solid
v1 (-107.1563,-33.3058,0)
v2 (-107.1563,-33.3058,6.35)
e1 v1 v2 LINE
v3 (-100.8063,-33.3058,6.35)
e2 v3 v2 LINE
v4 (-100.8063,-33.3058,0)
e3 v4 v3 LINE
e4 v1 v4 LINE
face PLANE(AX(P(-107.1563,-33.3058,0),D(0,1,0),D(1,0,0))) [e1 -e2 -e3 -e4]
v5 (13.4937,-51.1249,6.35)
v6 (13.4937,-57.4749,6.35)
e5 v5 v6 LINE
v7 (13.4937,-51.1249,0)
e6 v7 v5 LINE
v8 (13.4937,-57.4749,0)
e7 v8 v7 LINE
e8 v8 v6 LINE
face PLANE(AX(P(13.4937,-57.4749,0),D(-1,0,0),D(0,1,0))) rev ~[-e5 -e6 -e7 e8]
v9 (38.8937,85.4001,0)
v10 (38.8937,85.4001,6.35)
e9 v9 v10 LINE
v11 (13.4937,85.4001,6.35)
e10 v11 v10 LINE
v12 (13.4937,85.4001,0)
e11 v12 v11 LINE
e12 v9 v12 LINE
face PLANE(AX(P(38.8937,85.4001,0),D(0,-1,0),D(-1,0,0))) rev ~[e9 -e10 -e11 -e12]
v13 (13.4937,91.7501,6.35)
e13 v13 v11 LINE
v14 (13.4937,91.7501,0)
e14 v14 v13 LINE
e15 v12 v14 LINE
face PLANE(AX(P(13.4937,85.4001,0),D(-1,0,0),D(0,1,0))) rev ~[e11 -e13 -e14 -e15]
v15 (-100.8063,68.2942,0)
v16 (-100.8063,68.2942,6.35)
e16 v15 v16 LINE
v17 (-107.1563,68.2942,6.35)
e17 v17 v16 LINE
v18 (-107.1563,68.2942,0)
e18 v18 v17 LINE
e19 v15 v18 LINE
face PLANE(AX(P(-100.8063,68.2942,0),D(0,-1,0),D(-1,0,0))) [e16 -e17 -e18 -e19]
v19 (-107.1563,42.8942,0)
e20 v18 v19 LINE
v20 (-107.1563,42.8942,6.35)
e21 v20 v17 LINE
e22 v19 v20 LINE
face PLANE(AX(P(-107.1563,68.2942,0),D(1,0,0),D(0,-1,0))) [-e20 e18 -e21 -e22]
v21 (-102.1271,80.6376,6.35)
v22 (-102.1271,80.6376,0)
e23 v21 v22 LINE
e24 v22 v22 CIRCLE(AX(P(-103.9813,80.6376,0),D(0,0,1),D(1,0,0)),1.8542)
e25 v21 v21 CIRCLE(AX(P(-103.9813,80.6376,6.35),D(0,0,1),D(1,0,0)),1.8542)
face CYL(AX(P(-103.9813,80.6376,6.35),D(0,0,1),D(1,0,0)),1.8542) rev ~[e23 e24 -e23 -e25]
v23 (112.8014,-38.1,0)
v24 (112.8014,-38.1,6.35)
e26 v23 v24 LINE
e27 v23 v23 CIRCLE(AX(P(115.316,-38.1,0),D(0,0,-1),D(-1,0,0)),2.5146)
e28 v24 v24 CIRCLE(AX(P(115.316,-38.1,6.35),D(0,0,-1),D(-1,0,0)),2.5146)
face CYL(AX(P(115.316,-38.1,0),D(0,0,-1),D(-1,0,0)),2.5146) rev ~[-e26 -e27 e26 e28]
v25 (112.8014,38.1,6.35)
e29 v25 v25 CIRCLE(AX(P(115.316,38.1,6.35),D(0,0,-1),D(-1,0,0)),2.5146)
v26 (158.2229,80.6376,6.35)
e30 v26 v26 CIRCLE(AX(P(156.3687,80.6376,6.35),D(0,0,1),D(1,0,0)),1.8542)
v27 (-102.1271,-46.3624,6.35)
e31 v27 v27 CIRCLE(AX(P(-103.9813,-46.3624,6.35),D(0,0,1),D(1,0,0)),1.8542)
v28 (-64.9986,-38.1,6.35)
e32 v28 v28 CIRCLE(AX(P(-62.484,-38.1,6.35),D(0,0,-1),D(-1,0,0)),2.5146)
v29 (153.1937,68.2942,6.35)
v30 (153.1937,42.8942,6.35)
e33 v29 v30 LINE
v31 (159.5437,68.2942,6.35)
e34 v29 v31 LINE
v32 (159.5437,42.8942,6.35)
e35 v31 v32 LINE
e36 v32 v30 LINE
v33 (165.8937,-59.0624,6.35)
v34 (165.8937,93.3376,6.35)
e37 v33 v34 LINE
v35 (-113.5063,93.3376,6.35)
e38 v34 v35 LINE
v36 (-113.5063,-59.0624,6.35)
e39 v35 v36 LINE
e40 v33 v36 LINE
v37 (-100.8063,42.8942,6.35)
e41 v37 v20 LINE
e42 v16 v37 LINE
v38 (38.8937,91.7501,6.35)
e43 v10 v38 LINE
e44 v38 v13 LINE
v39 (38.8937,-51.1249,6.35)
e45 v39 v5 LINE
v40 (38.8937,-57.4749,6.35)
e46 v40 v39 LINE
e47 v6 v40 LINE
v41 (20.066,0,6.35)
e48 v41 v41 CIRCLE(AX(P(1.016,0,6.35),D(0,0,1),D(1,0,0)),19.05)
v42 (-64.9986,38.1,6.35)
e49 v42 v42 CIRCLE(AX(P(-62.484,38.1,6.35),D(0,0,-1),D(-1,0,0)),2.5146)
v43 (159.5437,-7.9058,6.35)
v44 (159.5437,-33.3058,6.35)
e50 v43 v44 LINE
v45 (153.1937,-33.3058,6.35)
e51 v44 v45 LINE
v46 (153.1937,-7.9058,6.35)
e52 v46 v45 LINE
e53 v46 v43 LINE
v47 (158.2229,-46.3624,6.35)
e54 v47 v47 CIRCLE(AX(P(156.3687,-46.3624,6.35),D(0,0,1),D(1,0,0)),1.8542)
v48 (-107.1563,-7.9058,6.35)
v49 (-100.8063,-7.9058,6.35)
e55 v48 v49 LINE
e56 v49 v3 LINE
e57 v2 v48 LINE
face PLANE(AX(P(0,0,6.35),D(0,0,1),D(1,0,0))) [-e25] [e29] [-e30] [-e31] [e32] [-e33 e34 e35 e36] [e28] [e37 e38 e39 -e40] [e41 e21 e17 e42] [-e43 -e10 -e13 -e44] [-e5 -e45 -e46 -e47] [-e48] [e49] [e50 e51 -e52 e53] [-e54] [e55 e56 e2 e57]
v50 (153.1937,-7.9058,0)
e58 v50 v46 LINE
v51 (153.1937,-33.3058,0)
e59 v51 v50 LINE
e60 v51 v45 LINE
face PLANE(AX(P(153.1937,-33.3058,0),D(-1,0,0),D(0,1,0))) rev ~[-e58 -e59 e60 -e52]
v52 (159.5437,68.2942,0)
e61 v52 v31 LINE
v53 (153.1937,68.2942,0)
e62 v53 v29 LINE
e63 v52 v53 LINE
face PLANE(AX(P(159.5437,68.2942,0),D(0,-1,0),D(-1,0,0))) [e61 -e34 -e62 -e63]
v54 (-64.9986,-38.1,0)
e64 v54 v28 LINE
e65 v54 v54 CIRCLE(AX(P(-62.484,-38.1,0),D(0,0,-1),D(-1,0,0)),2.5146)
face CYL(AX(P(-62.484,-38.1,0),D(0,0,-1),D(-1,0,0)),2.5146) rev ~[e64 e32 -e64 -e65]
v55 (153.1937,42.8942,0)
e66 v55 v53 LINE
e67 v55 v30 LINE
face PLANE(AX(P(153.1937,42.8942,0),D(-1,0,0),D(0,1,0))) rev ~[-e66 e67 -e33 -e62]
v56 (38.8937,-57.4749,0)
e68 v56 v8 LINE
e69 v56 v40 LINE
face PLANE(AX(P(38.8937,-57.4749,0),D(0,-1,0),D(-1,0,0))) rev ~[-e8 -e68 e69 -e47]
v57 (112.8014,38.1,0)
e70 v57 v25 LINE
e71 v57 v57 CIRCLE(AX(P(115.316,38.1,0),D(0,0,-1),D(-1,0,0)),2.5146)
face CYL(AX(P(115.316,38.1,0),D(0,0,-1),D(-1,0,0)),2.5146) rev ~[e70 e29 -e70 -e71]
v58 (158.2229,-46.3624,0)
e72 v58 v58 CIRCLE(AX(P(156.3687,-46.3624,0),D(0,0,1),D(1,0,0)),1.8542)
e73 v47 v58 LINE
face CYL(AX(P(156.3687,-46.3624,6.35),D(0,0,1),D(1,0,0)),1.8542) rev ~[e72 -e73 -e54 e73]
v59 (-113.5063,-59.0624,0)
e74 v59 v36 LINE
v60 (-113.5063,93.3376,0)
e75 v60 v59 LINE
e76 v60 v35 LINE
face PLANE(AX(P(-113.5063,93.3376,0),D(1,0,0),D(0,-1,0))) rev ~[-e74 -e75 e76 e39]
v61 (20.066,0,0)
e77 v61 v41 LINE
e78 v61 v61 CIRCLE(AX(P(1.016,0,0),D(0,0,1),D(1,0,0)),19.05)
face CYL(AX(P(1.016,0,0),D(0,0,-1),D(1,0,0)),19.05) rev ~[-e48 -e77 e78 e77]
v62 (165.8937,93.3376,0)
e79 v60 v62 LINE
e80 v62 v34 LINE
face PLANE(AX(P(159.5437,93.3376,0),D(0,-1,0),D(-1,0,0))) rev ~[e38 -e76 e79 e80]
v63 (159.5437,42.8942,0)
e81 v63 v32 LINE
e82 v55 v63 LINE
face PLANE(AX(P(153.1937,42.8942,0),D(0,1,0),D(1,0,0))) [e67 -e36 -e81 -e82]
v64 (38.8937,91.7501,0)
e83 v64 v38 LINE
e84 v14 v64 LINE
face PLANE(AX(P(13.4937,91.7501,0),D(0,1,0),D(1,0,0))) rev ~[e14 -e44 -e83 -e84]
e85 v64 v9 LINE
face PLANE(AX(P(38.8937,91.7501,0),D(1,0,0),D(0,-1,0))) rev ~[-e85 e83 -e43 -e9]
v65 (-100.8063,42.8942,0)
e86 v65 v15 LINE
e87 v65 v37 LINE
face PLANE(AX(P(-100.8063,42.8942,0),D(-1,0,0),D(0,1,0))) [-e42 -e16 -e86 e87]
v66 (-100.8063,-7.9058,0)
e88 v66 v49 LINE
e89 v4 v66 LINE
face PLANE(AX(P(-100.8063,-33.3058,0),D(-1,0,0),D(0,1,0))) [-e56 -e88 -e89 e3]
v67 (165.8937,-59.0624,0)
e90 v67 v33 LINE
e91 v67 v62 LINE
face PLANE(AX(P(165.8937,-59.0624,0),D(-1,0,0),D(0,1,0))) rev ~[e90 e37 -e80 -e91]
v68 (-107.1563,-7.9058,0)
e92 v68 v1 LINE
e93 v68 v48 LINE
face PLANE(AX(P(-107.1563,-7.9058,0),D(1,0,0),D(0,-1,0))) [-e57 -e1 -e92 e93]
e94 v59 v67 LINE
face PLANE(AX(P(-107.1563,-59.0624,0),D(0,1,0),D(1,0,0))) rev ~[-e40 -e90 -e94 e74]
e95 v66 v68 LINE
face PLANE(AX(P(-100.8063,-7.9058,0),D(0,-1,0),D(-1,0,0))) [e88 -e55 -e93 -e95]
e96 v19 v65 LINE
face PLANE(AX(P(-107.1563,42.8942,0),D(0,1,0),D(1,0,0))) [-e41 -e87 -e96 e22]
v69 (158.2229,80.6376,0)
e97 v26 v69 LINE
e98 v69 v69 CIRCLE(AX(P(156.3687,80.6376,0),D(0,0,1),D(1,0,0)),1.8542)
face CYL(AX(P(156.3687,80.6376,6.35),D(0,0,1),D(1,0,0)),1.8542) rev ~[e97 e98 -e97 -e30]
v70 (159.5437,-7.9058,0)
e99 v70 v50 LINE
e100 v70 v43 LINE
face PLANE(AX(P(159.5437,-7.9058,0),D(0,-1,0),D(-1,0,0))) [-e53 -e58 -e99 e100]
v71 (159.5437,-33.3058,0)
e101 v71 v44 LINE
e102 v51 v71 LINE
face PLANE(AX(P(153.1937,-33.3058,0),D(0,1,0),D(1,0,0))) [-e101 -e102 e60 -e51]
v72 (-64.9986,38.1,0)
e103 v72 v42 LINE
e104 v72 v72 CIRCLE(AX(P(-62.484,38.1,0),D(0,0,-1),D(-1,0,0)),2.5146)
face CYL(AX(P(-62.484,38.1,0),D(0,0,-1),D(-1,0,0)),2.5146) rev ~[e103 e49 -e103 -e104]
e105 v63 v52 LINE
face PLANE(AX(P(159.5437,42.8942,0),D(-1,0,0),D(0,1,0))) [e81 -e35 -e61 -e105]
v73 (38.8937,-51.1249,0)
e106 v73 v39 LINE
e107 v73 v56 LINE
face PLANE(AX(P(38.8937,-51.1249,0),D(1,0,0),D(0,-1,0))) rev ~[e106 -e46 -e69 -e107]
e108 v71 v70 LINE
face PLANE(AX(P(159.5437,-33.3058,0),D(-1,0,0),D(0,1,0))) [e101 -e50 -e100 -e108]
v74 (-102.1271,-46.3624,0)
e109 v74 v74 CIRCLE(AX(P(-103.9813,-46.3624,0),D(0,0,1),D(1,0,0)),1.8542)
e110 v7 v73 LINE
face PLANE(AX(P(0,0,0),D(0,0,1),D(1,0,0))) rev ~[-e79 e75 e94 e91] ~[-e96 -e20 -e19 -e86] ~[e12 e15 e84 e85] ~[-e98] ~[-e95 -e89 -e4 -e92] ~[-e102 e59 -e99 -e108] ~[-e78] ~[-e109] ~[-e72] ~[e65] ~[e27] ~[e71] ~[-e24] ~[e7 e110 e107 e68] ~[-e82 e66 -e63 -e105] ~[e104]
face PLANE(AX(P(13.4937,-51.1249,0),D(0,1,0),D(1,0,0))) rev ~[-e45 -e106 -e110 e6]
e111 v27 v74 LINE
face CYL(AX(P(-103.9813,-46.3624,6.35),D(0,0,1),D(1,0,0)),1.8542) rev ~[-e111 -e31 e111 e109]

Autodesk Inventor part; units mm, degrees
ref_plane "YZ Plane" through (0, 0, 0) normal (1, 0, 0) x (0, 1, 0)
ref_plane "XZ Plane" through (0, 0, 0) normal (0, 1, 0) x (-1, 0, 0)
ref_plane "XY Plane" through (0, 0, 0) normal (0, 0, 1) x (1, 0, 0)
sketch "Sketch1" plane through (0, 0, 0) normal (0, 0, 1) x (1, 0, 0)
  circle A0 centre (1.016, 0) radius 19.05
  line L0 (159.5437, -28.575) -> (159.5437, 29.0493) projected
  line L1 (145.8277, 86.9876) -> (-55.3403, 86.9876) projected
  line L2 (159.5437, 93.3376) -> (-107.1563, 93.3376)
  line L3 (-107.1563, 93.3376) -> (-107.1563, -59.0624)
  line L4 (-107.1563, -59.0624) -> (159.5437, -59.0624)
  line L5 (159.5437, -59.0624) -> (159.5437, 93.3376)
  point P0 (0, 0)
  dimension "d0" = 266.7
  dimension "d1" = 152.4
  dimension "d15" = 38.1
extrude "Extrusion1" add sketch "Sketch1" along normal blind 6.35
sketch "Sketch2" plane through (0, 0, 6.35) normal (0, 0, 1) x (1, 0, 0)
  line L0 (-107.1563, 93.3376) -> (159.5437, 93.3376) projected
  line L1 (-107.1563, -59.0624) -> (-107.1563, 93.3376) projected
  line L2 (-103.9813, 93.3376) -> (-103.9813, -59.0624) construction
  circle A0 centre (-103.9813, 80.6376) radius 1.8542
  dimension "d4" = 3.175
  dimension "d5" = 3.7084
  dimension "d6" = 12.7
extrude "Extrusion2" cut sketch "Sketch2" against normal through all
pattern_linear "Rectangular Pattern1" count 2 spacing 127 along (0, -1, 0) count 2 spacing 260.35 along (1, 0, 0) of "Extrusion2"
sketch "Sketch3" plane through (0, 0, 0) normal (0, 0, -1) x (-1, 0, 0)
  circle A0 centre (62.484, 38.1) radius 2.5146 projected
  circle A1 centre (62.484, -38.1) radius 2.5146 projected
  circle A2 centre (-115.316, -38.1) radius 2.5146 projected
  circle A3 centre (-115.316, 38.1) radius 2.5146 projected
  point P0 (0, 0)
extrude "Extrusion3" cut sketch "Sketch3" against normal through all
sketch "Sketch4" plane through (0, 0, 0) normal (0, 0, -1) x (-1, 0, 0)
  line L0 (107.1563, 93.3376) -> (113.5063, 93.3376)
  line L1 (113.5063, 93.3376) -> (113.5063, -59.0624)
  line L2 (113.5063, -59.0624) -> (107.1563, -59.0624)
  line L3 (107.1563, -59.0624) -> (107.1563, 93.3376)
  line L4 (-159.5437, -59.0624) -> (-165.8937, -59.0624)
  line L5 (-165.8937, -59.0624) -> (-165.8937, 93.3376)
  line L6 (-165.8937, 93.3376) -> (-159.5437, 93.3376)
  line L7 (-159.5437, 93.3376) -> (-159.5437, -59.0624)
  point P0 (0, 0)
  dimension "d18" = 6.35
  dimension "d19" = 6.35
extrude "Extrusion4" add sketch "Sketch4" against normal blind 6.35
sketch "Sketch5" plane through (0, 0, 0) normal (0, 0, -1) x (-1, 0, 0)
  line L0 (-159.5437, -59.0624) -> (-159.5437, 93.3376) projected
  line L1 (-159.5437, 93.3376) -> (-153.1937, 93.3376) projected
  line L2 (-153.1937, -59.0624) -> (-153.1937, 93.3376) projected
  line L3 (-159.5437, -59.0624) -> (-153.1937, -59.0624) projected
  line L4 (-159.5437, 68.2942) -> (-153.1937, 68.2942)
  line L5 (-153.1937, 68.2942) -> (-153.1937, 42.8942)
  line L6 (-153.1937, 42.8942) -> (-159.5437, 42.8942)
  line L7 (-159.5437, 42.8942) -> (-159.5437, 68.2942)
  line L8 (-159.5437, -7.9058) -> (-153.1937, -7.9058)
  line L9 (-153.1937, -7.9058) -> (-153.1937, -33.3058)
  line L10 (-153.1937, -33.3058) -> (-159.5437, -33.3058)
  line L11 (-159.5437, -33.3058) -> (-159.5437, -7.9058)
  line L12 (100.8063, 68.2942) -> (107.1563, 68.2942)
  line L13 (107.1563, 68.2942) -> (107.1563, 42.8942)
  line L14 (107.1563, 42.8942) -> (100.8063, 42.8942)
  line L15 (100.8063, 42.8942) -> (100.8063, 68.2942)
  line L16 (100.8063, -7.9058) -> (107.1563, -7.9058)
  line L17 (107.1563, -7.9058) -> (107.1563, -33.3058)
  line L18 (107.1563, -33.3058) -> (100.8063, -33.3058)
  line L19 (100.8063, -33.3058) -> (100.8063, -7.9058)
  point P0 (0, 0)
  dimension "d22" = 25.4
  dimension "d25" = 76.2
  dimension "d28" = 260.35
extrude "Extrusion5" cut sketch "Sketch5" against normal through all contours L0 L8 L2 L10 | L0 L4 L2 L6 | L12 L13 L14 L15 | L16 L17 L18 L19
sketch "Sketch6" plane through (0, 0, 0) normal (0, 0, -1) x (-1, 0, 0)
  line L0 (-13.4937, 85.4001) -> (-13.4937, 91.7501) projected
  line L1 (-13.4937, 91.7501) -> (-38.8937, 91.7501) projected
  line L2 (-38.8937, 91.7501) -> (-38.8937, 85.4001) projected
  line L3 (-38.8937, 85.4001) -> (-13.4937, 85.4001) projected
  line L4 (-13.4937, -57.4749) -> (-13.4937, -51.1249) projected
  line L5 (-13.4937, -51.1249) -> (-38.8937, -51.1249) projected
  line L6 (-38.8937, -51.1249) -> (-38.8937, -57.4749) projected
  line L7 (-38.8937, -57.4749) -> (-13.4937, -57.4749) projected
  point P0 (0, 0)
extrude "Extrusion6" cut sketch "Sketch6" against normal through all
properties part number "panStepperMountRB02" material "Wood (Oak)"
